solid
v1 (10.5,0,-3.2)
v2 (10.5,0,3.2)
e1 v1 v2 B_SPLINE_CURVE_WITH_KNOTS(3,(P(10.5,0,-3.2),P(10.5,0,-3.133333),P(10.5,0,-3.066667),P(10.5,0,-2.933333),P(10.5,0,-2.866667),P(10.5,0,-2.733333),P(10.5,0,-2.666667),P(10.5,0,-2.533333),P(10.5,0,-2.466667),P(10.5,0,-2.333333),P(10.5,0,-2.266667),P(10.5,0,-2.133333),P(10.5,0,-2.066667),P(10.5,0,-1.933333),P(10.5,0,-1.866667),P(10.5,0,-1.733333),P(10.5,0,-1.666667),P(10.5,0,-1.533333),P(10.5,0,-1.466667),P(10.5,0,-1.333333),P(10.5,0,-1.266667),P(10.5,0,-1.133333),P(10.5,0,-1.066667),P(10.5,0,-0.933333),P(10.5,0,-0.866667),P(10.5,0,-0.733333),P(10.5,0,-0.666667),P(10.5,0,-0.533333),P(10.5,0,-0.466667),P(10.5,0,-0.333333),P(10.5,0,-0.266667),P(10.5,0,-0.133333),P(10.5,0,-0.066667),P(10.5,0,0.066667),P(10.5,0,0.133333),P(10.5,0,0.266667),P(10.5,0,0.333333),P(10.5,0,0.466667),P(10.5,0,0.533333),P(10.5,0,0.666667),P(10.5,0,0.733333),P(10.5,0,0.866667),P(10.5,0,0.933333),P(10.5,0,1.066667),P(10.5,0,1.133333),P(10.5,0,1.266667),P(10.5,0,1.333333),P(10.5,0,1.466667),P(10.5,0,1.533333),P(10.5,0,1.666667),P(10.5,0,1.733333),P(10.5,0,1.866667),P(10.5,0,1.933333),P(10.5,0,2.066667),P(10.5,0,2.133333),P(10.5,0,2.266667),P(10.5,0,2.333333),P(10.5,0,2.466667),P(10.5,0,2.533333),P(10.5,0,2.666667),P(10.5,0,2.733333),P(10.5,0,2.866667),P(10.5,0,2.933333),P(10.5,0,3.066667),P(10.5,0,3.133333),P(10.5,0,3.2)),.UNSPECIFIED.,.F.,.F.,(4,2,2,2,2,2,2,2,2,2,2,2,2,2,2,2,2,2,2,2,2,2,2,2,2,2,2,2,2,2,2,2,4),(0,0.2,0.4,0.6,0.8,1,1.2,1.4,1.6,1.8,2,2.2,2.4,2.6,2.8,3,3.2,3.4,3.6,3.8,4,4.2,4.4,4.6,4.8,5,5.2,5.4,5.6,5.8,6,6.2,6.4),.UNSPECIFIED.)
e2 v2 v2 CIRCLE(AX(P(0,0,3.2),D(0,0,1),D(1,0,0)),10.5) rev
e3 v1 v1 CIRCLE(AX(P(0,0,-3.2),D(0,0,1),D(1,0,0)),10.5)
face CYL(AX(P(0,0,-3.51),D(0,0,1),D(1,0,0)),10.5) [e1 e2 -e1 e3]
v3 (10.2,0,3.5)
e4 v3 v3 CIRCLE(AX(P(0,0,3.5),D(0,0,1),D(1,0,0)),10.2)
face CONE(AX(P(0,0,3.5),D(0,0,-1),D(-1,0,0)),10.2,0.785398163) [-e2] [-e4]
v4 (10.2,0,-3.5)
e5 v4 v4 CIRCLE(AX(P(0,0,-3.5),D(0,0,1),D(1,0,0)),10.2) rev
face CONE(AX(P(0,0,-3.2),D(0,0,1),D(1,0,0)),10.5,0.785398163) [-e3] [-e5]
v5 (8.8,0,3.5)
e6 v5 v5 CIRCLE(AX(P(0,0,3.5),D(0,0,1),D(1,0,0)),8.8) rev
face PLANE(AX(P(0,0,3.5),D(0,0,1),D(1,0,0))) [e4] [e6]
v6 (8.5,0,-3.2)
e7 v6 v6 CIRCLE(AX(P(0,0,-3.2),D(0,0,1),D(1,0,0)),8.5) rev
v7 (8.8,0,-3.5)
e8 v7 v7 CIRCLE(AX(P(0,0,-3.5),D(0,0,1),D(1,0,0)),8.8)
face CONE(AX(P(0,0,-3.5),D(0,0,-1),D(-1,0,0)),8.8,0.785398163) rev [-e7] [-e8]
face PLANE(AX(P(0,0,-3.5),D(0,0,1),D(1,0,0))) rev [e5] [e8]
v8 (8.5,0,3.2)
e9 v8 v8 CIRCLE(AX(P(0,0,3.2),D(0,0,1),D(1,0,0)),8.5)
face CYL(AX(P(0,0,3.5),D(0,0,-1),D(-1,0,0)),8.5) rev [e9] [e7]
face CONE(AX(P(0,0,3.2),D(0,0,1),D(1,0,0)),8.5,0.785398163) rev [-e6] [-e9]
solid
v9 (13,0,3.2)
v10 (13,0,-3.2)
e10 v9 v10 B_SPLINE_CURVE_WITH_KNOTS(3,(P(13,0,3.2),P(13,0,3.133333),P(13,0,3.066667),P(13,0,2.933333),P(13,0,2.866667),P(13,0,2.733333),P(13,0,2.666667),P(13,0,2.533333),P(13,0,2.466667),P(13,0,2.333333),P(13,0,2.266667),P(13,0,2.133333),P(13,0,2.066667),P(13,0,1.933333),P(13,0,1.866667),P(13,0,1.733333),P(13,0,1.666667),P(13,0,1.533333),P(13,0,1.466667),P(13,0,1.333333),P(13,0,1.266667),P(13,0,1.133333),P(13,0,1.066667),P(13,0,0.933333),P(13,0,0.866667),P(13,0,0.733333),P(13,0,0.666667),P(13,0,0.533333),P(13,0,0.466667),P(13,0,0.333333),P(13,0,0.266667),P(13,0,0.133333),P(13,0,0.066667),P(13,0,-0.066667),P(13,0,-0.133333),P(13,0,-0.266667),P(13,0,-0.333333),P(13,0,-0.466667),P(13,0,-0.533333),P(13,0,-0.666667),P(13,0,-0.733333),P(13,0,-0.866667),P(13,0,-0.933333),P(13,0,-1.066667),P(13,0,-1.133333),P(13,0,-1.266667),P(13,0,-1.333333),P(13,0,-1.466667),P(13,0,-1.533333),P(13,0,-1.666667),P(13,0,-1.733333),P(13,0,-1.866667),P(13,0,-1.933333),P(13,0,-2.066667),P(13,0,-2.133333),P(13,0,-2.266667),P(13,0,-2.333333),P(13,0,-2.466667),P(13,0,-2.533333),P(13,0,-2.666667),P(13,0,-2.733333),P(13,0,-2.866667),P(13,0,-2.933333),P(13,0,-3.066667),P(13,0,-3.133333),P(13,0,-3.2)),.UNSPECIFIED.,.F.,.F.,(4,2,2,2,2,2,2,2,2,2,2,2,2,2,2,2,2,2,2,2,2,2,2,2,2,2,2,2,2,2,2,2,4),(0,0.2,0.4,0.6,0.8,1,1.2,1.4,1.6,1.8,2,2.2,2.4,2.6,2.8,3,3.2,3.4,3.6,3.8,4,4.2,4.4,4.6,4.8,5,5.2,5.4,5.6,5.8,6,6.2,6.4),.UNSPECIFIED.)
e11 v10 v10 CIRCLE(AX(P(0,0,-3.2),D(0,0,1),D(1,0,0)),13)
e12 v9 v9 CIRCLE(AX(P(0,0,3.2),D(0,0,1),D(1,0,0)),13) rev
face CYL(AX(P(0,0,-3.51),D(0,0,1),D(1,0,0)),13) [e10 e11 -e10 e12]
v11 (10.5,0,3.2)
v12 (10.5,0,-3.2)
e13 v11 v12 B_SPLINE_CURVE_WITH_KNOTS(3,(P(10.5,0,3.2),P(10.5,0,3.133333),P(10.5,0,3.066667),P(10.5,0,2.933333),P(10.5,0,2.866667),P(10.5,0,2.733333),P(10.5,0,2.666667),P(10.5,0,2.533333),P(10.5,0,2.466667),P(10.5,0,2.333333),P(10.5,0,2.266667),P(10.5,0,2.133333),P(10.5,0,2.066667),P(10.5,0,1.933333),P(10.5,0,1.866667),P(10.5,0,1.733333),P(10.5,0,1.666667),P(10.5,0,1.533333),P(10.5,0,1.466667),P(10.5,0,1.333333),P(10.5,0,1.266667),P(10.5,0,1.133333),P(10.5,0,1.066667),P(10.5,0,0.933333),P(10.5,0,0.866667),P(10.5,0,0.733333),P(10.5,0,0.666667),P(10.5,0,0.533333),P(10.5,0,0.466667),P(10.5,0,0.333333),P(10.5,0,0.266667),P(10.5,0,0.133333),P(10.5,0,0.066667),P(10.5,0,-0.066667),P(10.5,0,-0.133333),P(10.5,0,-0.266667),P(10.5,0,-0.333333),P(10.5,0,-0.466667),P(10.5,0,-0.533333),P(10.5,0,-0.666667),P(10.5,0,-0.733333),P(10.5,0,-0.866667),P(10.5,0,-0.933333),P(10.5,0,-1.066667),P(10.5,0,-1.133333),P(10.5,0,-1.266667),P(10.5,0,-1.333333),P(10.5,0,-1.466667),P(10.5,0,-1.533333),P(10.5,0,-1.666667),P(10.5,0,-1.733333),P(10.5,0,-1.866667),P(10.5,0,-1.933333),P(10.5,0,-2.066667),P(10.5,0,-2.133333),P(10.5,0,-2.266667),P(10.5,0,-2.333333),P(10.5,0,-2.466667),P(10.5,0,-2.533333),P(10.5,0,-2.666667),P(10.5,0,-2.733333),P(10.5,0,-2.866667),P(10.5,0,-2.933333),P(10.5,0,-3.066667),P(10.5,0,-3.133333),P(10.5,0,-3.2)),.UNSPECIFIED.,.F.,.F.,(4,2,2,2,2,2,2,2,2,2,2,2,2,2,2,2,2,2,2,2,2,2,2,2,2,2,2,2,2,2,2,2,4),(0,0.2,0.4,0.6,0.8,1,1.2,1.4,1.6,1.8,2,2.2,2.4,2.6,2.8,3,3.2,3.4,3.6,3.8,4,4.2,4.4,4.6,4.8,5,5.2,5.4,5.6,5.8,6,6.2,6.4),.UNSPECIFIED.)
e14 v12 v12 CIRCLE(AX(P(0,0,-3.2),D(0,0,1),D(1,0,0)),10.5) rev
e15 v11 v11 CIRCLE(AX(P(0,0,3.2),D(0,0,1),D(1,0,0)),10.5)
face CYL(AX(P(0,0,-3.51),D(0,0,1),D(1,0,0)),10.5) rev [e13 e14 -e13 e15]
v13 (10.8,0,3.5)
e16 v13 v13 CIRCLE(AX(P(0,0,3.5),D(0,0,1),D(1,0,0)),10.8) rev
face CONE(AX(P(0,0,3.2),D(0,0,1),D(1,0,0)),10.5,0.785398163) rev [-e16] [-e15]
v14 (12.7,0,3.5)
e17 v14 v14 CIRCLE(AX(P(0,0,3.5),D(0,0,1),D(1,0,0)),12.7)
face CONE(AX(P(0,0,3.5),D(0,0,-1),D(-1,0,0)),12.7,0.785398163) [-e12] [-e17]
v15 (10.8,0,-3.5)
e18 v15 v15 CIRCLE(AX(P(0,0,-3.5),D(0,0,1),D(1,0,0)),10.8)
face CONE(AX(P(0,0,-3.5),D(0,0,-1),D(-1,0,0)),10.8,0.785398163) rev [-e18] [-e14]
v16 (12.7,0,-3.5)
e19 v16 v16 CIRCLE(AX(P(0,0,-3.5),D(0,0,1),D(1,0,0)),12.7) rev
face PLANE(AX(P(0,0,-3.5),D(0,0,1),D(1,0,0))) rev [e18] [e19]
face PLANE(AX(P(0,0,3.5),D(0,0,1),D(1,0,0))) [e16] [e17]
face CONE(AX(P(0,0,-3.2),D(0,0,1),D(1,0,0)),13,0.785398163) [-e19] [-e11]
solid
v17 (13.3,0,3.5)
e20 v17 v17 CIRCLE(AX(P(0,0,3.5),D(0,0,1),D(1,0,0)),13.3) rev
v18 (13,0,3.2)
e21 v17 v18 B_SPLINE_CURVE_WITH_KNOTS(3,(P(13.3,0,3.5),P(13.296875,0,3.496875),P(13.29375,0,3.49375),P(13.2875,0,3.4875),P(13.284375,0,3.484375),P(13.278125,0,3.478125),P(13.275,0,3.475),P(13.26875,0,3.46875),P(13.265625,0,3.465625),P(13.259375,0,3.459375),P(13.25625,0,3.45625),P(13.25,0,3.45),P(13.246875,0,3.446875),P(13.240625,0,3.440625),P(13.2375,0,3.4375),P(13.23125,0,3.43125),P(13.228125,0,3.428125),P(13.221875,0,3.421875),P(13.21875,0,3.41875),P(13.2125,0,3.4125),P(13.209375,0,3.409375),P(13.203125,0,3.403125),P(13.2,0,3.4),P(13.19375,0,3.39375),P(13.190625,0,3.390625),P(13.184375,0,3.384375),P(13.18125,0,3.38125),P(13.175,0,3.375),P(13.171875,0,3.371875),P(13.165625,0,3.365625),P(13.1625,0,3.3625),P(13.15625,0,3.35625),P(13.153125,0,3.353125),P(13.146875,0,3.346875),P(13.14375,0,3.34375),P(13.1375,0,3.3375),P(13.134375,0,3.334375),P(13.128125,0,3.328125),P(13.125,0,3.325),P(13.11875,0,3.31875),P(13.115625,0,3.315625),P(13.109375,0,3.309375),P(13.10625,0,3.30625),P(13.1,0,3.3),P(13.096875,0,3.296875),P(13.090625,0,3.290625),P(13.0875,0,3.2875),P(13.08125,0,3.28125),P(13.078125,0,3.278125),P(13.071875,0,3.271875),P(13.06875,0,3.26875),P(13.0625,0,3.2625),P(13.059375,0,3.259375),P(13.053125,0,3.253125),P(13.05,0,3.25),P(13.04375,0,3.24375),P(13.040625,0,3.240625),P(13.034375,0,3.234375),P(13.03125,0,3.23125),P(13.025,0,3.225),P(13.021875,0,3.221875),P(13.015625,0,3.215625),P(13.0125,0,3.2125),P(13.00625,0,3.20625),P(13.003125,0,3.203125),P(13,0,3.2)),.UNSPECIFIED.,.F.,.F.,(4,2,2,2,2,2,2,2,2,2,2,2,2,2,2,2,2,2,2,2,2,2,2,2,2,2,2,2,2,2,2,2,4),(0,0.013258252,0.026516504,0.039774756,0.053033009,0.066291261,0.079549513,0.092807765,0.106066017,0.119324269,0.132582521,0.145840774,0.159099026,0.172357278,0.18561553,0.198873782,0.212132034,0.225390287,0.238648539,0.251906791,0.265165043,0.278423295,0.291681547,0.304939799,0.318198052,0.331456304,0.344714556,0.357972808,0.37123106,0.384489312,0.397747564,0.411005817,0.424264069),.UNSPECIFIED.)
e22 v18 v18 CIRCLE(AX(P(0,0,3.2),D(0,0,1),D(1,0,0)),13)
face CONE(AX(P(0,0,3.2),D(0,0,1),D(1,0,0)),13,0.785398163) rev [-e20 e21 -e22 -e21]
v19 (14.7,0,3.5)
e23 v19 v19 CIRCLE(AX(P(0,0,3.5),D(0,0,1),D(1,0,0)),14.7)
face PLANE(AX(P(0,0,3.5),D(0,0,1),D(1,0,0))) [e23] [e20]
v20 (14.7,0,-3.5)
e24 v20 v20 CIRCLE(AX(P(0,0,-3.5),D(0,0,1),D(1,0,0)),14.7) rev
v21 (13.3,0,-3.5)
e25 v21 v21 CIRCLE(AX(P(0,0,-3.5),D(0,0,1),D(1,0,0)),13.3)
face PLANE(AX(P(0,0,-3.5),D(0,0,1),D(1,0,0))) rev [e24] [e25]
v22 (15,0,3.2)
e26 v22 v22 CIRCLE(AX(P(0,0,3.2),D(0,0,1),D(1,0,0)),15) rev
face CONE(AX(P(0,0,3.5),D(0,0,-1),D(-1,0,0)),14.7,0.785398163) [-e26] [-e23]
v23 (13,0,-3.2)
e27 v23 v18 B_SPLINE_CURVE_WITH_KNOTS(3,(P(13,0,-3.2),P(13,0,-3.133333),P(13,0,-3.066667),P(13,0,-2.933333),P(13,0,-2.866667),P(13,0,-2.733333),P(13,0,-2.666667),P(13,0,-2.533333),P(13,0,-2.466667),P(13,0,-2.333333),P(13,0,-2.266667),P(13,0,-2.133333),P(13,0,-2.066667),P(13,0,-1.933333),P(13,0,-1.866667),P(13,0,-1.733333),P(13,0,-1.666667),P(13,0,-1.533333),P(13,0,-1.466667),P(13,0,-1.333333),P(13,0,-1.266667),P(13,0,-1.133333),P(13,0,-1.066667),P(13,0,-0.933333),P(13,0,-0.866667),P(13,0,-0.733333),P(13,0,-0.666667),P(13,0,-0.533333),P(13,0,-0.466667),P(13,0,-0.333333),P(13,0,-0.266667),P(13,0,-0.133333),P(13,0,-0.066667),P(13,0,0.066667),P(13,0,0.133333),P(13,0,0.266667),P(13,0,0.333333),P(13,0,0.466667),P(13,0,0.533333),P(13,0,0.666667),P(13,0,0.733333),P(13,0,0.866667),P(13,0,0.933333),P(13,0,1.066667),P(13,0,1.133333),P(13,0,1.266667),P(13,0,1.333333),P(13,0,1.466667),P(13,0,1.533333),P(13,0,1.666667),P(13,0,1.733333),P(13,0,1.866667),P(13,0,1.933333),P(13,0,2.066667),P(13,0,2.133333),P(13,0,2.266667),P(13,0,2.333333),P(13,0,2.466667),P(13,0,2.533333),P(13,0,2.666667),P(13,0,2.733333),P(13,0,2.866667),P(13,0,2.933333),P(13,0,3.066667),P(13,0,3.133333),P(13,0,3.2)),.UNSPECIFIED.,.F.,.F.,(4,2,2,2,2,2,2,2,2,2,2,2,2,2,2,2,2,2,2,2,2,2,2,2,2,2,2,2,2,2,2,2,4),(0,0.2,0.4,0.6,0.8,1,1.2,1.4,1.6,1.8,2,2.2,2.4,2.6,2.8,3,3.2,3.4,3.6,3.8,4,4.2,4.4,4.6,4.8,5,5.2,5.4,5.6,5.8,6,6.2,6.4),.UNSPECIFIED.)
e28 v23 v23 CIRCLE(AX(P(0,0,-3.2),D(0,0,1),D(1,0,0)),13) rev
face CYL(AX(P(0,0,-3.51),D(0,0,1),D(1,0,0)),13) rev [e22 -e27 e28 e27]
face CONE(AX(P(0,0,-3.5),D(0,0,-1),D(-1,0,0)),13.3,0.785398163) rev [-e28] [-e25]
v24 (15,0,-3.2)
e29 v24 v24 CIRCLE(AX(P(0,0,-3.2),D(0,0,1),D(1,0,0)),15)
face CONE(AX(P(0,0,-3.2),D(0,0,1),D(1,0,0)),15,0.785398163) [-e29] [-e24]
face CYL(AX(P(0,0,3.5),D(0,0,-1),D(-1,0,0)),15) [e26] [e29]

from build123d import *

# Parameters (mm, degrees)
SKETCH1_R            = 15
SKETCH1_R_2          = 8.5
EXTRUDE1_DEPTH       = 3.5
SPLIT1_START         = -3.5
SPLIT1_OUTLINE_R     = 10.5
SPLIT1_OUTLINE_R_2   = 8.5
SPLIT1_DEPTH         = 7
SPLIT1_2_OUTLINE_R   = 13
SPLIT1_2_OUTLINE_R_2 = 10.5
SPLIT1_2_DEPTH       = 7
SPLIT1_3_OUTLINE_R   = 13
SPLIT1_3_OUTLINE_R_2 = 8.5
SPLIT1_3_DEPTH       = 7
CHAMFER1_SIZE        = 0.3
CHAMFER2_SIZE        = 0.3
CHAMFER3_SIZE        = 0.3


# Read off the part's stored shape, not the designer's step: Split1
with BuildPart() as part:
    # Sketch1 → Extrude1 (new, symmetric)
    with BuildSketch(Plane.XY):
        Circle(SKETCH1_R)
        Circle(SKETCH1_R_2, mode=Mode.SUBTRACT)
    extrude(amount=EXTRUDE1_DEPTH, both=True)

    # Split1 3 outline → Split1 3 (cut)
    with BuildSketch(Plane.XY.offset(SPLIT1_START)):
        Circle(SPLIT1_3_OUTLINE_R)
        Circle(SPLIT1_3_OUTLINE_R_2, mode=Mode.SUBTRACT)
    extrude(amount=SPLIT1_3_DEPTH, mode=Mode.SUBTRACT)

    # Chamfer1
    chamfer1_edges = [part.edges().sort_by_distance(p)[0] for p in [
        (-13, 0, -3.5),
        (-15, 0, -3.5),
        (-13, 0, 3.5),
        (-15, 0, 3.5),
    ]]
    chamfer(chamfer1_edges, length=CHAMFER1_SIZE)


with BuildPart() as body_2:
    # Split1 outline → Split1 (new body)
    with BuildSketch(Plane.XY.offset(SPLIT1_START)):
        Circle(SPLIT1_OUTLINE_R)
        Circle(SPLIT1_OUTLINE_R_2, mode=Mode.SUBTRACT)
    extrude(amount=SPLIT1_DEPTH)

    # Chamfer3
    chamfer3_edges = [body_2.edges().sort_by_distance(p)[0] for p in [
        (-8.5, 0, -3.5),
        (-8.5, 0, 3.5),
        (-10.5, 0, 3.5),
        (-10.5, 0, -3.5),
    ]]
    chamfer(chamfer3_edges, length=CHAMFER3_SIZE)


with BuildPart() as body_3:
    # Split1 2 outline → Split1 2 (new body)
    with BuildSketch(Plane.XY.offset(SPLIT1_START)):
        Circle(SPLIT1_2_OUTLINE_R)
        Circle(SPLIT1_2_OUTLINE_R_2, mode=Mode.SUBTRACT)
    extrude(amount=SPLIT1_2_DEPTH)

    # Chamfer2
    chamfer2_edges = [body_3.edges().sort_by_distance(p)[0] for p in [
        (-10.5, 0, -3.5),
        (-13, 0, 3.5),
        (-10.5, 0, 3.5),
        (-13, 0, -3.5),
    ]]
    chamfer(chamfer2_edges, length=CHAMFER2_SIZE)


solid = Compound([part.part, body_2.part, body_3.part])
